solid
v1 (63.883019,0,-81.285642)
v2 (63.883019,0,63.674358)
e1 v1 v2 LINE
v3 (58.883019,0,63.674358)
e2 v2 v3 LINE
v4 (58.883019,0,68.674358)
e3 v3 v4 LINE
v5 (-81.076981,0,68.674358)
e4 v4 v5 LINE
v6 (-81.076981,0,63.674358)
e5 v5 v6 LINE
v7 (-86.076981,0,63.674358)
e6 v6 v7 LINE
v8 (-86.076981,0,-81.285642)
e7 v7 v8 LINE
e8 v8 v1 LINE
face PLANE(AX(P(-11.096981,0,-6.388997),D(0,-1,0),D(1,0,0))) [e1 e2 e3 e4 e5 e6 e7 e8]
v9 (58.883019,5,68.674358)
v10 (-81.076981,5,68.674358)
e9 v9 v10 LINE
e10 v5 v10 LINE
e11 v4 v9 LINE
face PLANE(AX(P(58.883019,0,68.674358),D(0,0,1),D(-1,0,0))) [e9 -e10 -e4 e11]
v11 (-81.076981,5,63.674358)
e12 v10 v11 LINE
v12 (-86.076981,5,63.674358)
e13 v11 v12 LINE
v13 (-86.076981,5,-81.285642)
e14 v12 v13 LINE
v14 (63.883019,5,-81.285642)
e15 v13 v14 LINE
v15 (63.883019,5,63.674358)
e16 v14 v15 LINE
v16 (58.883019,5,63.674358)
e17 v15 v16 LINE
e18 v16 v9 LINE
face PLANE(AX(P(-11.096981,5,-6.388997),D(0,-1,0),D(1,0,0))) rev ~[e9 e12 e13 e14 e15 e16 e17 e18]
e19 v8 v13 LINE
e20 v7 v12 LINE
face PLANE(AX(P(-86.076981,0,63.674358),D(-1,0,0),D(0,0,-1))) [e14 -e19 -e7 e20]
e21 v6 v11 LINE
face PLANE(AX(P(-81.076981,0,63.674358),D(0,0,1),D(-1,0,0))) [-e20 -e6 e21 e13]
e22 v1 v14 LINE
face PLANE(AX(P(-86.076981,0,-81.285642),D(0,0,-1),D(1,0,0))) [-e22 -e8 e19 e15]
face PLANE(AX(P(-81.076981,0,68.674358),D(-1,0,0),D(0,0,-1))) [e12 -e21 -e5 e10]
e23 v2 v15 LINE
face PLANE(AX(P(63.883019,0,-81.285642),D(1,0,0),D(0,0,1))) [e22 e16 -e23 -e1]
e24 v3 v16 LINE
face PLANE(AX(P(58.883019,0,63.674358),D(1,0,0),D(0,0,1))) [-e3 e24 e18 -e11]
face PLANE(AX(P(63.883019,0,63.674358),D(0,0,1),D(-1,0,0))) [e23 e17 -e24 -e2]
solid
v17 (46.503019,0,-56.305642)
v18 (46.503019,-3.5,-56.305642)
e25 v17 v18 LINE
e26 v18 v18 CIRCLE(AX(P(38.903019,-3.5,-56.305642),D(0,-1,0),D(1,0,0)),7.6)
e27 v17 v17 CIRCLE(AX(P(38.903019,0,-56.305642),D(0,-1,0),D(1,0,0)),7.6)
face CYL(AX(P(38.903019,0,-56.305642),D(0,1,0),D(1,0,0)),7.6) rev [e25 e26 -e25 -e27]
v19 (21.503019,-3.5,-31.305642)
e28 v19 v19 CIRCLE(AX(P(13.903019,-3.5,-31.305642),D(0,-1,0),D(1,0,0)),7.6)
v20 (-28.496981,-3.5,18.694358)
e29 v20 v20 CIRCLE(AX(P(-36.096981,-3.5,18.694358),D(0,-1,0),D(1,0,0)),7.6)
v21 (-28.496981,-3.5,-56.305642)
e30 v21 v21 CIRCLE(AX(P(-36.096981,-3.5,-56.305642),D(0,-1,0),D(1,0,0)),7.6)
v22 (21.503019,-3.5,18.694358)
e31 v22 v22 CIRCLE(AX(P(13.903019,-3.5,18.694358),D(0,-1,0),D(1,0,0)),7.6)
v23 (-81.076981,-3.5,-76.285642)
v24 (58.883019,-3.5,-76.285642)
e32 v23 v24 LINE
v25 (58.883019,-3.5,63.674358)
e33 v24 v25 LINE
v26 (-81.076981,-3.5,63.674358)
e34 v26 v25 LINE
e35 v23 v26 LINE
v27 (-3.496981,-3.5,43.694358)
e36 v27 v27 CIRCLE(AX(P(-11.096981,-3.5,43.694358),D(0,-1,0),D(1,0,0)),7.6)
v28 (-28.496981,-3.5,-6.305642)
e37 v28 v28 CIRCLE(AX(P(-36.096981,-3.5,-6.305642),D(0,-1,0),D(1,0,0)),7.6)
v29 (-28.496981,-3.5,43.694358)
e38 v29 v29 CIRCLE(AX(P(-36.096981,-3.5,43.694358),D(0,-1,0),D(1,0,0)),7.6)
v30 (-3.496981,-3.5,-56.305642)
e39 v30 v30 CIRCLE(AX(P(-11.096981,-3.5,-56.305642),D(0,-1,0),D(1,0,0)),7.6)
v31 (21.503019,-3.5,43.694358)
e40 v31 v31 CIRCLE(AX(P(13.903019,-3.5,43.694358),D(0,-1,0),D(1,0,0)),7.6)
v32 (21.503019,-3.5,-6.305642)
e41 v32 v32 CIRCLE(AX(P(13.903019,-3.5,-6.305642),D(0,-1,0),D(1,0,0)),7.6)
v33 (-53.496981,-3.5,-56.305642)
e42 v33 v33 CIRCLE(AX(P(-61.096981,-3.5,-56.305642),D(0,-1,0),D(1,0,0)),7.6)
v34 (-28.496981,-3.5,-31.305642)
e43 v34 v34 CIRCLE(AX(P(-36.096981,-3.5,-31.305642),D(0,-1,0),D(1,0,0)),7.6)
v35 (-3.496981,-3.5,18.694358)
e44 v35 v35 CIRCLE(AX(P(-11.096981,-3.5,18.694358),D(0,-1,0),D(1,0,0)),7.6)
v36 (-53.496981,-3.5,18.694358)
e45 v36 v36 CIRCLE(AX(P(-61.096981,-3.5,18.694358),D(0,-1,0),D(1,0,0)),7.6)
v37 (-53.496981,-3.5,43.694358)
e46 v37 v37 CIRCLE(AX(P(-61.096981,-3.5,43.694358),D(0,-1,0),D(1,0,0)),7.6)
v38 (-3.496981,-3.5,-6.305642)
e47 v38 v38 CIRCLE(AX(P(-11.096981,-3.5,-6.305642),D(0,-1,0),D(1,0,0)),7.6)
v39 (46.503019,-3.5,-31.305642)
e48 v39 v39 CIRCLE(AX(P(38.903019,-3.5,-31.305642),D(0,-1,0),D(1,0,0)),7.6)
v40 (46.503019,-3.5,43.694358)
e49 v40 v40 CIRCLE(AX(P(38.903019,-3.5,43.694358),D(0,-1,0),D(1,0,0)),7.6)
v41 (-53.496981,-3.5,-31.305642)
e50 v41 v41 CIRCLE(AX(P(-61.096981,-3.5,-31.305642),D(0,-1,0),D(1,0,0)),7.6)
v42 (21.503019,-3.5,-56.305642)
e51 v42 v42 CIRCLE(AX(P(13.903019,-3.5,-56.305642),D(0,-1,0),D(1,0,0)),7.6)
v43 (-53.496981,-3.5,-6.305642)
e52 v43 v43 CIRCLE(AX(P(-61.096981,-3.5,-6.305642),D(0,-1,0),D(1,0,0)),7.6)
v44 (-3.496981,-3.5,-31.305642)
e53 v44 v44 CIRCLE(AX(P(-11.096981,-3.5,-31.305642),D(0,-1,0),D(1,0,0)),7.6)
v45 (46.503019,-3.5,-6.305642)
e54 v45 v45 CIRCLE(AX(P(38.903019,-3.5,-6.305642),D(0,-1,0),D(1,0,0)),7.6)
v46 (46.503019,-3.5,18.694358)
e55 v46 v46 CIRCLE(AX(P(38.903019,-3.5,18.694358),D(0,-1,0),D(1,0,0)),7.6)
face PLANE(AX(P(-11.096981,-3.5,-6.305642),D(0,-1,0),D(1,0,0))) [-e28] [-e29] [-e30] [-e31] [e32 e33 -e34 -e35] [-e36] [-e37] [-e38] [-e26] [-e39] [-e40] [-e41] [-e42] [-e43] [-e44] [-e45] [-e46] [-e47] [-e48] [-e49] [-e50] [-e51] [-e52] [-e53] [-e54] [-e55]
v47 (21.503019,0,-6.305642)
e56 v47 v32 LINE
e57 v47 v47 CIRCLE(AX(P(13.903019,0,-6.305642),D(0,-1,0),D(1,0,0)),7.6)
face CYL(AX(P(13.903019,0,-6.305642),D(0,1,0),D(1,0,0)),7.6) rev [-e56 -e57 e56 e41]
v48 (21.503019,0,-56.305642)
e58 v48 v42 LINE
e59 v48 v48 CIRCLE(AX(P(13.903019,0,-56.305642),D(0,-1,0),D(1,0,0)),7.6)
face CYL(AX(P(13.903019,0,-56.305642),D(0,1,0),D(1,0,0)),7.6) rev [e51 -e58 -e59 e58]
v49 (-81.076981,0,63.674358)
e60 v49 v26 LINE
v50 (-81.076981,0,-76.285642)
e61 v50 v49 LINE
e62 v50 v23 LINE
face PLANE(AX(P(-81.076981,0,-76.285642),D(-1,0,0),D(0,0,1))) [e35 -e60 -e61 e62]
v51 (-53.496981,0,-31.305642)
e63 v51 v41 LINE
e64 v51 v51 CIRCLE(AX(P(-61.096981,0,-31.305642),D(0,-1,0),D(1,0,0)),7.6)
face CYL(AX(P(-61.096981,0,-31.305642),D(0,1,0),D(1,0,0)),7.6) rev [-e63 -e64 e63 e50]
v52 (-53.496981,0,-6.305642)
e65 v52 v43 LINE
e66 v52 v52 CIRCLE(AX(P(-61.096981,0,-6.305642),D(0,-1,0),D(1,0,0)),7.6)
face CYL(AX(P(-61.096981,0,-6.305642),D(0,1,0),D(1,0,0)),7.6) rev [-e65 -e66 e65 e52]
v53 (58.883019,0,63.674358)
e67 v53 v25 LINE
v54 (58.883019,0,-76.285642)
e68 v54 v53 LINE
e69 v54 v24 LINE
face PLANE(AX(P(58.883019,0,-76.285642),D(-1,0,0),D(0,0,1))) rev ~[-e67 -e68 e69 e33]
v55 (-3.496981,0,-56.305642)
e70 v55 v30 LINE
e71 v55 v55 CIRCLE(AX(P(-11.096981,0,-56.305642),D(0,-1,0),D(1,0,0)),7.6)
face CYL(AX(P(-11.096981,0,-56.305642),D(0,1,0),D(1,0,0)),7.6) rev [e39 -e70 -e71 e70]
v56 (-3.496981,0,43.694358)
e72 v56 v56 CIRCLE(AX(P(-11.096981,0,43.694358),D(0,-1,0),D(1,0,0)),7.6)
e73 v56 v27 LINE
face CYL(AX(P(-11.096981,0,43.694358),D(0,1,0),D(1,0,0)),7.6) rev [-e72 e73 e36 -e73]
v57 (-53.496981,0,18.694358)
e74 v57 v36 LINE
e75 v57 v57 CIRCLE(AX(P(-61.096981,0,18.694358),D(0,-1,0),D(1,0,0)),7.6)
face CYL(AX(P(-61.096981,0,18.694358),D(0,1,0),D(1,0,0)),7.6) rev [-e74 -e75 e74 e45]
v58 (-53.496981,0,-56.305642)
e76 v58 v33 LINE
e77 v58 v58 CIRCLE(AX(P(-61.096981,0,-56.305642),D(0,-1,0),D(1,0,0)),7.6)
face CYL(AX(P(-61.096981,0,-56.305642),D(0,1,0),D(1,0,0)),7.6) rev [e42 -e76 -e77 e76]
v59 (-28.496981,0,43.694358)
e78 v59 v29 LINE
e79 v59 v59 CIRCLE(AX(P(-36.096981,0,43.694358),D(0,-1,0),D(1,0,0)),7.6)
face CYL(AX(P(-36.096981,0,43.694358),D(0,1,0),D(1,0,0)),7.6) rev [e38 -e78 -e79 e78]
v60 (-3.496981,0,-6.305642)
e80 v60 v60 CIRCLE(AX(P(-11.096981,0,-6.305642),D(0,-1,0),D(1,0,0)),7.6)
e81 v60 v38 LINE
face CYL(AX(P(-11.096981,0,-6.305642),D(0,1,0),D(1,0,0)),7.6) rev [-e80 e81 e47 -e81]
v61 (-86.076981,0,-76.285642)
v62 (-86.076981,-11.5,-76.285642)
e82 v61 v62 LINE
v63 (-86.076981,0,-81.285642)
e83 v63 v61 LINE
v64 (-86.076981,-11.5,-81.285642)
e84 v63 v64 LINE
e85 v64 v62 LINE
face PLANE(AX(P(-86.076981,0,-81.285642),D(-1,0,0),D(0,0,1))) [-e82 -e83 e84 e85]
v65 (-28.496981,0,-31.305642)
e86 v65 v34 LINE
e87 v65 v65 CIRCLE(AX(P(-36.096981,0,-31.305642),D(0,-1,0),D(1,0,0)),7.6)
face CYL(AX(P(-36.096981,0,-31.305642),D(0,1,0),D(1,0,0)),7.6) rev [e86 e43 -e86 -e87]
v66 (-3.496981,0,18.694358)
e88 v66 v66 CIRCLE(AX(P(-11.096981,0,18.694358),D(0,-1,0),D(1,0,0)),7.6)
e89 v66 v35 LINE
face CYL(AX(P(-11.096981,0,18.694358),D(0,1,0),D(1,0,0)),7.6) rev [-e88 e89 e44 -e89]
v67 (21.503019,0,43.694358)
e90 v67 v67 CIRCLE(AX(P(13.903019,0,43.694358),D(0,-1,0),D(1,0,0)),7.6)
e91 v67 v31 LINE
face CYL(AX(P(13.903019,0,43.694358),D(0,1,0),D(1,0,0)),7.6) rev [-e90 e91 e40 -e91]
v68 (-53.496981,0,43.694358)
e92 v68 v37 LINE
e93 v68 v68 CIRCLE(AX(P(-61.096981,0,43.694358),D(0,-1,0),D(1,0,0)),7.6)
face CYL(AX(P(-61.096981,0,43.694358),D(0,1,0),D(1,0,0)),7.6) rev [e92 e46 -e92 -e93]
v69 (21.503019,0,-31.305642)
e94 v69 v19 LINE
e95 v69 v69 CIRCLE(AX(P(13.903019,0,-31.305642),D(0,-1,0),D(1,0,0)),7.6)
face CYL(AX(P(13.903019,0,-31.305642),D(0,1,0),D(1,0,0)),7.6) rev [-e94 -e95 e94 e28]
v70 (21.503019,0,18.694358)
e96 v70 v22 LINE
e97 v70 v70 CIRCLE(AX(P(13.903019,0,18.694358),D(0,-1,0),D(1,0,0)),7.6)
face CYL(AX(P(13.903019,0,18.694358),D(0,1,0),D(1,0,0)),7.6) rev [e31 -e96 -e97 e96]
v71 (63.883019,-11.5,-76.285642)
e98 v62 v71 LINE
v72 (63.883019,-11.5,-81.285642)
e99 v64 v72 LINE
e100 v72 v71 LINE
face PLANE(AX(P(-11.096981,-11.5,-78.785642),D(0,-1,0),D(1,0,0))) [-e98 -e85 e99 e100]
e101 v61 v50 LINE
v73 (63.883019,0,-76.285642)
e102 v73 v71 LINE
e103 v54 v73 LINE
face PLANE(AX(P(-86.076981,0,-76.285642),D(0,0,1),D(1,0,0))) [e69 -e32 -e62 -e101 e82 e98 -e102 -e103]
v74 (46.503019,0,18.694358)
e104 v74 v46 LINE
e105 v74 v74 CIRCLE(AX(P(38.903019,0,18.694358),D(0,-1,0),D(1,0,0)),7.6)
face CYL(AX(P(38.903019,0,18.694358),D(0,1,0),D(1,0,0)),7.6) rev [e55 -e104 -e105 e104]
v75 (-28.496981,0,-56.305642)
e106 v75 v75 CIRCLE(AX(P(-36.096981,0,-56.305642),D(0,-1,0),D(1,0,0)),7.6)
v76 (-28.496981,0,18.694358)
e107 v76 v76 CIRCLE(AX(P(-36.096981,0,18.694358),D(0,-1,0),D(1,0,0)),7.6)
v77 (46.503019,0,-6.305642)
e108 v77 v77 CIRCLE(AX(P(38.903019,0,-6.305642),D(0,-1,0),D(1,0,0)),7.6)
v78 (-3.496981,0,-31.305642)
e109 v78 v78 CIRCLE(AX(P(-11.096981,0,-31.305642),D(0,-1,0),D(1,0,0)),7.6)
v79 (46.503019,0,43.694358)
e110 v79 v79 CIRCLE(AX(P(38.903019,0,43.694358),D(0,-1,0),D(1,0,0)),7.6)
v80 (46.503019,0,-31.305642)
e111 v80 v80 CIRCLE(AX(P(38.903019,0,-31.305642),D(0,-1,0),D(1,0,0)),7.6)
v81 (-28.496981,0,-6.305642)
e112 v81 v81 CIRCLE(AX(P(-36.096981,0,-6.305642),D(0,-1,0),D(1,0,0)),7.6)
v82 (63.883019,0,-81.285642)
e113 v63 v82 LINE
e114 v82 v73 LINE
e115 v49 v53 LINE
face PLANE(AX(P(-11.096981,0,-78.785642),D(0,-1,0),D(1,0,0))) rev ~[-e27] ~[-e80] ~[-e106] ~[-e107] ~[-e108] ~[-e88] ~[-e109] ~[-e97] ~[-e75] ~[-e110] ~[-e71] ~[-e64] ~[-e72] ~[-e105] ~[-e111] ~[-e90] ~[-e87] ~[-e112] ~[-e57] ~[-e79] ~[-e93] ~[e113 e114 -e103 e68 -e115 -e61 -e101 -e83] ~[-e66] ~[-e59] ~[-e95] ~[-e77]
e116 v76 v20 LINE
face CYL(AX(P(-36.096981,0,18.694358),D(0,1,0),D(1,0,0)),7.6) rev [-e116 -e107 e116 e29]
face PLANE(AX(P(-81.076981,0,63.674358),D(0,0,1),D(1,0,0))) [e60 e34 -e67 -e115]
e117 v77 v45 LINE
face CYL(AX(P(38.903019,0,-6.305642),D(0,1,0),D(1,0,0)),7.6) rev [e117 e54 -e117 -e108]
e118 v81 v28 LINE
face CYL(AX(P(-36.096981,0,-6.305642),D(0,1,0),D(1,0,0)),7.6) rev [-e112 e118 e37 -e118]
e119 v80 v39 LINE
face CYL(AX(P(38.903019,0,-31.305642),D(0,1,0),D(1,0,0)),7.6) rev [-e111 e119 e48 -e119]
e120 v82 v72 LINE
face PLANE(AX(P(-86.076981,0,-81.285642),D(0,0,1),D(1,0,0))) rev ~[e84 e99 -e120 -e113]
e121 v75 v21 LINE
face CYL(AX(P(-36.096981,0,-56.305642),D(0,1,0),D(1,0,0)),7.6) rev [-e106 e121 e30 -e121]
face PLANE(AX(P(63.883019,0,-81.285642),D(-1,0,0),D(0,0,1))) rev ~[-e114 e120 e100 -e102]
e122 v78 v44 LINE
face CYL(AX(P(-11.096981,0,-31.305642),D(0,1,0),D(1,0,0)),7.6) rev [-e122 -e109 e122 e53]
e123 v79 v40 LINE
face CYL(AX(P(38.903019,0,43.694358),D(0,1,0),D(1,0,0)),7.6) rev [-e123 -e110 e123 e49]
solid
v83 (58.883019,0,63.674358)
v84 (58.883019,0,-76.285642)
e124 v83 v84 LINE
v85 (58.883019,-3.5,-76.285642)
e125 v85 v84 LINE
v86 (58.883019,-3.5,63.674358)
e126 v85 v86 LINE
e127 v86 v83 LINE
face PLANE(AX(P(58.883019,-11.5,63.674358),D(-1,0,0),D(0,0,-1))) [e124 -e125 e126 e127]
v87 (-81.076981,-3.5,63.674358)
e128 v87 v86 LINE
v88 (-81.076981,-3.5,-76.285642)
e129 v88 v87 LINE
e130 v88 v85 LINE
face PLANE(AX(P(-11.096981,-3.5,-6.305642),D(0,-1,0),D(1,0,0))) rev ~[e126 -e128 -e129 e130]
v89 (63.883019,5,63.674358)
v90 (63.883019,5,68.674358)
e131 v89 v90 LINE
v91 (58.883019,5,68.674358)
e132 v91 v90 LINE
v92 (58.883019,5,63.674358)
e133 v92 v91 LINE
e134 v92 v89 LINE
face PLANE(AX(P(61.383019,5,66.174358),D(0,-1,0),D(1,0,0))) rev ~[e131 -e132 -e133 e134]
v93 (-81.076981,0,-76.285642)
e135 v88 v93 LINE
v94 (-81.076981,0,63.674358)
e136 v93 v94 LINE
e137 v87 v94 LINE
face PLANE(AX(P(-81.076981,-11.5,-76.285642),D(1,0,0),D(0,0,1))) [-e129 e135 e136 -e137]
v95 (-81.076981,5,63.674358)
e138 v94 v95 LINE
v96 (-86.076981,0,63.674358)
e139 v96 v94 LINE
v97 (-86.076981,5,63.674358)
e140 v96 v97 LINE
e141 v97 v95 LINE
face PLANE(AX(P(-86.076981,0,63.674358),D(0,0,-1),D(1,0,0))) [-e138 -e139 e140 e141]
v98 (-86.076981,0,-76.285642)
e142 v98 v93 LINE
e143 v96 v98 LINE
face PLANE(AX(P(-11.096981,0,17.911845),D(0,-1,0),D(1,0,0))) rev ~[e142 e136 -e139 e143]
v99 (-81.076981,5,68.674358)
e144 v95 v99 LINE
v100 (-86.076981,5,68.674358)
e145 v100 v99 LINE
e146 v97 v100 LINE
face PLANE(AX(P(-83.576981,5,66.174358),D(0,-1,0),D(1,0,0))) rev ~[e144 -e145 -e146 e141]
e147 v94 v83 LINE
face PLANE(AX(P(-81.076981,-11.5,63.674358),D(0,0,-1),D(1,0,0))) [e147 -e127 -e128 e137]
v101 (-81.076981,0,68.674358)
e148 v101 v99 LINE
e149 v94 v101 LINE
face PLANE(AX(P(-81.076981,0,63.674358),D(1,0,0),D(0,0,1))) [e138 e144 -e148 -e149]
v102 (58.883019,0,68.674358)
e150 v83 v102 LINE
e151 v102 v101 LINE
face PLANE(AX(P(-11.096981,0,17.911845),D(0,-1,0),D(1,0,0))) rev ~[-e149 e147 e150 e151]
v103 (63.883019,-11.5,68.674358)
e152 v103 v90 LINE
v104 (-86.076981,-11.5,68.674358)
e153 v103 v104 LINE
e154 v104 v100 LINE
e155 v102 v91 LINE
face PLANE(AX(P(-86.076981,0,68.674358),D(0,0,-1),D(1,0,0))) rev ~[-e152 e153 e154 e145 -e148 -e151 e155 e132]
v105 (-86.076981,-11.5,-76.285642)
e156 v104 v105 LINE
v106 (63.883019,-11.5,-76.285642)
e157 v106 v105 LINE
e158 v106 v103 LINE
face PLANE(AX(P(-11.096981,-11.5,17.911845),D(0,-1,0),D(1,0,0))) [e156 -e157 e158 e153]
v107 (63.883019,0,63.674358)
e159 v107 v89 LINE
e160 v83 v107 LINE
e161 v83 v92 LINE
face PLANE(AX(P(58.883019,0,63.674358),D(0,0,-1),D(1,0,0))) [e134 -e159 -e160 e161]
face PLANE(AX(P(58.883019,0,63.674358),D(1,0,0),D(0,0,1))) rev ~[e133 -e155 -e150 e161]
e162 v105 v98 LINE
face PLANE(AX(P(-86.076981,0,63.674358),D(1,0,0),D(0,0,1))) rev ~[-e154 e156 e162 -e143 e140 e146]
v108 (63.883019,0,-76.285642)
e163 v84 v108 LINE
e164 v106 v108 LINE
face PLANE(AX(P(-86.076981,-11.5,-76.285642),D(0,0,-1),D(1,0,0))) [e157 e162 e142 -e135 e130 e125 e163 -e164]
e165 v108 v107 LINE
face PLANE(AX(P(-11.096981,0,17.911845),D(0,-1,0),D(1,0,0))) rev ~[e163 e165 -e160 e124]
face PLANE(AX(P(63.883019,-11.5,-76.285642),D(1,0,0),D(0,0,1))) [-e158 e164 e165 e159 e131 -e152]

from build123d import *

# Parameters (mm, degrees)
F0_W      = 139.96
F0_H      = 139.96
F0_R      = 7.6
F1_DEPTH  = 3.5
F3_W      = 139.96
F3_H      = 139.96
F4_DEPTH  = 8
F7_DEPTH  = 11.5
F8_W      = 149.96
F8_H      = 5
F9_DEPTH  = 11.5
F10_W     = 5
F10_H     = 5
F11_DEPTH = 5
F13_DEPTH = 5


with BuildPart() as f1:
    # F0 (on Front) → F1 (new body)
    with BuildSketch(Plane.XZ):
        with Locations((-11.0969811678, -6.305641681)):
            Rectangle(F0_W, F0_H)
        with Locations((-61.0969811678, -56.305641681)):
            Circle(F0_R, mode=Mode.SUBTRACT)
        with Locations((-36.0969811678, -56.305641681)):
            Circle(F0_R, mode=Mode.SUBTRACT)
        with Locations((-61.0969811678, -31.305641681)):
            Circle(F0_R, mode=Mode.SUBTRACT)
        with Locations((-36.0969811678, -31.305641681)):
            Circle(F0_R, mode=Mode.SUBTRACT)
        with Locations((-11.0969811678, -56.305641681)):
            Circle(F0_R, mode=Mode.SUBTRACT)
        with Locations((13.9030188322, -56.305641681)):
            Circle(F0_R, mode=Mode.SUBTRACT)
        with Locations((38.9030188322, -56.305641681)):
            Circle(F0_R, mode=Mode.SUBTRACT)
        with Locations((-11.0969811678, -31.305641681)):
            Circle(F0_R, mode=Mode.SUBTRACT)
        with Locations((13.9030188322, -31.305641681)):
            Circle(F0_R, mode=Mode.SUBTRACT)
        with Locations((38.9030188322, -31.305641681)):
            Circle(F0_R, mode=Mode.SUBTRACT)
        with Locations((-61.0969811678, -6.305641681)):
            Circle(F0_R, mode=Mode.SUBTRACT)
        with Locations((-61.0969811678, 18.694358319)):
            Circle(F0_R, mode=Mode.SUBTRACT)
        with Locations((-36.0969811678, -6.305641681)):
            Circle(F0_R, mode=Mode.SUBTRACT)
        with Locations((-36.0969811678, 18.694358319)):
            Circle(F0_R, mode=Mode.SUBTRACT)
        with Locations((-61.0969811678, 43.694358319)):
            Circle(F0_R, mode=Mode.SUBTRACT)
        with Locations((-36.0969811678, 43.694358319)):
            Circle(F0_R, mode=Mode.SUBTRACT)
        with Locations((-11.0969811678, -6.305641681)):
            Circle(F0_R, mode=Mode.SUBTRACT)
        with Locations((13.9030188322, -6.305641681)):
            Circle(F0_R, mode=Mode.SUBTRACT)
        with Locations((-11.0969811678, 18.694358319)):
            Circle(F0_R, mode=Mode.SUBTRACT)
        with Locations((13.9030188322, 18.694358319)):
            Circle(F0_R, mode=Mode.SUBTRACT)
        with Locations((38.9030188322, -6.305641681)):
            Circle(F0_R, mode=Mode.SUBTRACT)
        with Locations((38.9030188322, 18.694358319)):
            Circle(F0_R, mode=Mode.SUBTRACT)
        with Locations((-11.0969811678, 43.694358319)):
            Circle(F0_R, mode=Mode.SUBTRACT)
        with Locations((13.9030188322, 43.694358319)):
            Circle(F0_R, mode=Mode.SUBTRACT)
        with Locations((38.9030188322, 43.694358319)):
            Circle(F0_R, mode=Mode.SUBTRACT)
    extrude(amount=F1_DEPTH)

    # F8 (on Front) → F9 (join)
    with BuildSketch(Plane.XZ):
        with Locations((-11.0969811678, -78.785641681)):
            Rectangle(F8_W, F8_H)
    extrude(amount=F9_DEPTH)


with BuildPart() as f4:
    # F3 (on offset) → F4 (new body)
    with BuildSketch(Plane.XZ.offset(3.5)):
        with Locations((-11.0969811678, -6.305641681)):
            Rectangle(F3_W, F3_H)
    extrude(amount=F4_DEPTH)

    # F6 (on offset) → F7 (join)
    with BuildSketch(Plane.XZ.offset(11.5)):
        Polygon((-81.0769811678, -76.285641681), (-81.0769811678, 63.674358319), (58.8830188322, 63.674358319), (58.8830188322, -76.285641681), (63.8830188322, -76.285641681), (63.8830188322, 68.674358319), (-86.0769811678, 68.674358319), (-86.0769811678, -76.285641681), align=None)
    extrude(amount=-F7_DEPTH)

    # F10 (on Front) → F11 (join)
    with BuildSketch(Plane.XZ):
        with Locations((-83.5769811678, 66.174358319)):
            Rectangle(F10_W, F10_H)
        with Locations((61.3830188322, 66.174358319)):
            Rectangle(F10_W, F10_H)
    extrude(amount=-F11_DEPTH)


with BuildPart() as f13:
    # F12 (on Front) → F13 (new body)
    with BuildSketch(Plane.XZ):
        Polygon((58.8830188322, 63.674358319), (58.8830188322, 68.674358319), (-81.0769811678, 68.674358319), (-81.0769811678, 63.674358319), (-86.0769811678, 63.674358319), (-86.0769811678, -81.285641681), (63.8830188322, -81.285641681), (63.8830188322, 63.674358319), align=None)
    extrude(amount=-F13_DEPTH)


solid = Compound([f1.part, f4.part, f13.part])
